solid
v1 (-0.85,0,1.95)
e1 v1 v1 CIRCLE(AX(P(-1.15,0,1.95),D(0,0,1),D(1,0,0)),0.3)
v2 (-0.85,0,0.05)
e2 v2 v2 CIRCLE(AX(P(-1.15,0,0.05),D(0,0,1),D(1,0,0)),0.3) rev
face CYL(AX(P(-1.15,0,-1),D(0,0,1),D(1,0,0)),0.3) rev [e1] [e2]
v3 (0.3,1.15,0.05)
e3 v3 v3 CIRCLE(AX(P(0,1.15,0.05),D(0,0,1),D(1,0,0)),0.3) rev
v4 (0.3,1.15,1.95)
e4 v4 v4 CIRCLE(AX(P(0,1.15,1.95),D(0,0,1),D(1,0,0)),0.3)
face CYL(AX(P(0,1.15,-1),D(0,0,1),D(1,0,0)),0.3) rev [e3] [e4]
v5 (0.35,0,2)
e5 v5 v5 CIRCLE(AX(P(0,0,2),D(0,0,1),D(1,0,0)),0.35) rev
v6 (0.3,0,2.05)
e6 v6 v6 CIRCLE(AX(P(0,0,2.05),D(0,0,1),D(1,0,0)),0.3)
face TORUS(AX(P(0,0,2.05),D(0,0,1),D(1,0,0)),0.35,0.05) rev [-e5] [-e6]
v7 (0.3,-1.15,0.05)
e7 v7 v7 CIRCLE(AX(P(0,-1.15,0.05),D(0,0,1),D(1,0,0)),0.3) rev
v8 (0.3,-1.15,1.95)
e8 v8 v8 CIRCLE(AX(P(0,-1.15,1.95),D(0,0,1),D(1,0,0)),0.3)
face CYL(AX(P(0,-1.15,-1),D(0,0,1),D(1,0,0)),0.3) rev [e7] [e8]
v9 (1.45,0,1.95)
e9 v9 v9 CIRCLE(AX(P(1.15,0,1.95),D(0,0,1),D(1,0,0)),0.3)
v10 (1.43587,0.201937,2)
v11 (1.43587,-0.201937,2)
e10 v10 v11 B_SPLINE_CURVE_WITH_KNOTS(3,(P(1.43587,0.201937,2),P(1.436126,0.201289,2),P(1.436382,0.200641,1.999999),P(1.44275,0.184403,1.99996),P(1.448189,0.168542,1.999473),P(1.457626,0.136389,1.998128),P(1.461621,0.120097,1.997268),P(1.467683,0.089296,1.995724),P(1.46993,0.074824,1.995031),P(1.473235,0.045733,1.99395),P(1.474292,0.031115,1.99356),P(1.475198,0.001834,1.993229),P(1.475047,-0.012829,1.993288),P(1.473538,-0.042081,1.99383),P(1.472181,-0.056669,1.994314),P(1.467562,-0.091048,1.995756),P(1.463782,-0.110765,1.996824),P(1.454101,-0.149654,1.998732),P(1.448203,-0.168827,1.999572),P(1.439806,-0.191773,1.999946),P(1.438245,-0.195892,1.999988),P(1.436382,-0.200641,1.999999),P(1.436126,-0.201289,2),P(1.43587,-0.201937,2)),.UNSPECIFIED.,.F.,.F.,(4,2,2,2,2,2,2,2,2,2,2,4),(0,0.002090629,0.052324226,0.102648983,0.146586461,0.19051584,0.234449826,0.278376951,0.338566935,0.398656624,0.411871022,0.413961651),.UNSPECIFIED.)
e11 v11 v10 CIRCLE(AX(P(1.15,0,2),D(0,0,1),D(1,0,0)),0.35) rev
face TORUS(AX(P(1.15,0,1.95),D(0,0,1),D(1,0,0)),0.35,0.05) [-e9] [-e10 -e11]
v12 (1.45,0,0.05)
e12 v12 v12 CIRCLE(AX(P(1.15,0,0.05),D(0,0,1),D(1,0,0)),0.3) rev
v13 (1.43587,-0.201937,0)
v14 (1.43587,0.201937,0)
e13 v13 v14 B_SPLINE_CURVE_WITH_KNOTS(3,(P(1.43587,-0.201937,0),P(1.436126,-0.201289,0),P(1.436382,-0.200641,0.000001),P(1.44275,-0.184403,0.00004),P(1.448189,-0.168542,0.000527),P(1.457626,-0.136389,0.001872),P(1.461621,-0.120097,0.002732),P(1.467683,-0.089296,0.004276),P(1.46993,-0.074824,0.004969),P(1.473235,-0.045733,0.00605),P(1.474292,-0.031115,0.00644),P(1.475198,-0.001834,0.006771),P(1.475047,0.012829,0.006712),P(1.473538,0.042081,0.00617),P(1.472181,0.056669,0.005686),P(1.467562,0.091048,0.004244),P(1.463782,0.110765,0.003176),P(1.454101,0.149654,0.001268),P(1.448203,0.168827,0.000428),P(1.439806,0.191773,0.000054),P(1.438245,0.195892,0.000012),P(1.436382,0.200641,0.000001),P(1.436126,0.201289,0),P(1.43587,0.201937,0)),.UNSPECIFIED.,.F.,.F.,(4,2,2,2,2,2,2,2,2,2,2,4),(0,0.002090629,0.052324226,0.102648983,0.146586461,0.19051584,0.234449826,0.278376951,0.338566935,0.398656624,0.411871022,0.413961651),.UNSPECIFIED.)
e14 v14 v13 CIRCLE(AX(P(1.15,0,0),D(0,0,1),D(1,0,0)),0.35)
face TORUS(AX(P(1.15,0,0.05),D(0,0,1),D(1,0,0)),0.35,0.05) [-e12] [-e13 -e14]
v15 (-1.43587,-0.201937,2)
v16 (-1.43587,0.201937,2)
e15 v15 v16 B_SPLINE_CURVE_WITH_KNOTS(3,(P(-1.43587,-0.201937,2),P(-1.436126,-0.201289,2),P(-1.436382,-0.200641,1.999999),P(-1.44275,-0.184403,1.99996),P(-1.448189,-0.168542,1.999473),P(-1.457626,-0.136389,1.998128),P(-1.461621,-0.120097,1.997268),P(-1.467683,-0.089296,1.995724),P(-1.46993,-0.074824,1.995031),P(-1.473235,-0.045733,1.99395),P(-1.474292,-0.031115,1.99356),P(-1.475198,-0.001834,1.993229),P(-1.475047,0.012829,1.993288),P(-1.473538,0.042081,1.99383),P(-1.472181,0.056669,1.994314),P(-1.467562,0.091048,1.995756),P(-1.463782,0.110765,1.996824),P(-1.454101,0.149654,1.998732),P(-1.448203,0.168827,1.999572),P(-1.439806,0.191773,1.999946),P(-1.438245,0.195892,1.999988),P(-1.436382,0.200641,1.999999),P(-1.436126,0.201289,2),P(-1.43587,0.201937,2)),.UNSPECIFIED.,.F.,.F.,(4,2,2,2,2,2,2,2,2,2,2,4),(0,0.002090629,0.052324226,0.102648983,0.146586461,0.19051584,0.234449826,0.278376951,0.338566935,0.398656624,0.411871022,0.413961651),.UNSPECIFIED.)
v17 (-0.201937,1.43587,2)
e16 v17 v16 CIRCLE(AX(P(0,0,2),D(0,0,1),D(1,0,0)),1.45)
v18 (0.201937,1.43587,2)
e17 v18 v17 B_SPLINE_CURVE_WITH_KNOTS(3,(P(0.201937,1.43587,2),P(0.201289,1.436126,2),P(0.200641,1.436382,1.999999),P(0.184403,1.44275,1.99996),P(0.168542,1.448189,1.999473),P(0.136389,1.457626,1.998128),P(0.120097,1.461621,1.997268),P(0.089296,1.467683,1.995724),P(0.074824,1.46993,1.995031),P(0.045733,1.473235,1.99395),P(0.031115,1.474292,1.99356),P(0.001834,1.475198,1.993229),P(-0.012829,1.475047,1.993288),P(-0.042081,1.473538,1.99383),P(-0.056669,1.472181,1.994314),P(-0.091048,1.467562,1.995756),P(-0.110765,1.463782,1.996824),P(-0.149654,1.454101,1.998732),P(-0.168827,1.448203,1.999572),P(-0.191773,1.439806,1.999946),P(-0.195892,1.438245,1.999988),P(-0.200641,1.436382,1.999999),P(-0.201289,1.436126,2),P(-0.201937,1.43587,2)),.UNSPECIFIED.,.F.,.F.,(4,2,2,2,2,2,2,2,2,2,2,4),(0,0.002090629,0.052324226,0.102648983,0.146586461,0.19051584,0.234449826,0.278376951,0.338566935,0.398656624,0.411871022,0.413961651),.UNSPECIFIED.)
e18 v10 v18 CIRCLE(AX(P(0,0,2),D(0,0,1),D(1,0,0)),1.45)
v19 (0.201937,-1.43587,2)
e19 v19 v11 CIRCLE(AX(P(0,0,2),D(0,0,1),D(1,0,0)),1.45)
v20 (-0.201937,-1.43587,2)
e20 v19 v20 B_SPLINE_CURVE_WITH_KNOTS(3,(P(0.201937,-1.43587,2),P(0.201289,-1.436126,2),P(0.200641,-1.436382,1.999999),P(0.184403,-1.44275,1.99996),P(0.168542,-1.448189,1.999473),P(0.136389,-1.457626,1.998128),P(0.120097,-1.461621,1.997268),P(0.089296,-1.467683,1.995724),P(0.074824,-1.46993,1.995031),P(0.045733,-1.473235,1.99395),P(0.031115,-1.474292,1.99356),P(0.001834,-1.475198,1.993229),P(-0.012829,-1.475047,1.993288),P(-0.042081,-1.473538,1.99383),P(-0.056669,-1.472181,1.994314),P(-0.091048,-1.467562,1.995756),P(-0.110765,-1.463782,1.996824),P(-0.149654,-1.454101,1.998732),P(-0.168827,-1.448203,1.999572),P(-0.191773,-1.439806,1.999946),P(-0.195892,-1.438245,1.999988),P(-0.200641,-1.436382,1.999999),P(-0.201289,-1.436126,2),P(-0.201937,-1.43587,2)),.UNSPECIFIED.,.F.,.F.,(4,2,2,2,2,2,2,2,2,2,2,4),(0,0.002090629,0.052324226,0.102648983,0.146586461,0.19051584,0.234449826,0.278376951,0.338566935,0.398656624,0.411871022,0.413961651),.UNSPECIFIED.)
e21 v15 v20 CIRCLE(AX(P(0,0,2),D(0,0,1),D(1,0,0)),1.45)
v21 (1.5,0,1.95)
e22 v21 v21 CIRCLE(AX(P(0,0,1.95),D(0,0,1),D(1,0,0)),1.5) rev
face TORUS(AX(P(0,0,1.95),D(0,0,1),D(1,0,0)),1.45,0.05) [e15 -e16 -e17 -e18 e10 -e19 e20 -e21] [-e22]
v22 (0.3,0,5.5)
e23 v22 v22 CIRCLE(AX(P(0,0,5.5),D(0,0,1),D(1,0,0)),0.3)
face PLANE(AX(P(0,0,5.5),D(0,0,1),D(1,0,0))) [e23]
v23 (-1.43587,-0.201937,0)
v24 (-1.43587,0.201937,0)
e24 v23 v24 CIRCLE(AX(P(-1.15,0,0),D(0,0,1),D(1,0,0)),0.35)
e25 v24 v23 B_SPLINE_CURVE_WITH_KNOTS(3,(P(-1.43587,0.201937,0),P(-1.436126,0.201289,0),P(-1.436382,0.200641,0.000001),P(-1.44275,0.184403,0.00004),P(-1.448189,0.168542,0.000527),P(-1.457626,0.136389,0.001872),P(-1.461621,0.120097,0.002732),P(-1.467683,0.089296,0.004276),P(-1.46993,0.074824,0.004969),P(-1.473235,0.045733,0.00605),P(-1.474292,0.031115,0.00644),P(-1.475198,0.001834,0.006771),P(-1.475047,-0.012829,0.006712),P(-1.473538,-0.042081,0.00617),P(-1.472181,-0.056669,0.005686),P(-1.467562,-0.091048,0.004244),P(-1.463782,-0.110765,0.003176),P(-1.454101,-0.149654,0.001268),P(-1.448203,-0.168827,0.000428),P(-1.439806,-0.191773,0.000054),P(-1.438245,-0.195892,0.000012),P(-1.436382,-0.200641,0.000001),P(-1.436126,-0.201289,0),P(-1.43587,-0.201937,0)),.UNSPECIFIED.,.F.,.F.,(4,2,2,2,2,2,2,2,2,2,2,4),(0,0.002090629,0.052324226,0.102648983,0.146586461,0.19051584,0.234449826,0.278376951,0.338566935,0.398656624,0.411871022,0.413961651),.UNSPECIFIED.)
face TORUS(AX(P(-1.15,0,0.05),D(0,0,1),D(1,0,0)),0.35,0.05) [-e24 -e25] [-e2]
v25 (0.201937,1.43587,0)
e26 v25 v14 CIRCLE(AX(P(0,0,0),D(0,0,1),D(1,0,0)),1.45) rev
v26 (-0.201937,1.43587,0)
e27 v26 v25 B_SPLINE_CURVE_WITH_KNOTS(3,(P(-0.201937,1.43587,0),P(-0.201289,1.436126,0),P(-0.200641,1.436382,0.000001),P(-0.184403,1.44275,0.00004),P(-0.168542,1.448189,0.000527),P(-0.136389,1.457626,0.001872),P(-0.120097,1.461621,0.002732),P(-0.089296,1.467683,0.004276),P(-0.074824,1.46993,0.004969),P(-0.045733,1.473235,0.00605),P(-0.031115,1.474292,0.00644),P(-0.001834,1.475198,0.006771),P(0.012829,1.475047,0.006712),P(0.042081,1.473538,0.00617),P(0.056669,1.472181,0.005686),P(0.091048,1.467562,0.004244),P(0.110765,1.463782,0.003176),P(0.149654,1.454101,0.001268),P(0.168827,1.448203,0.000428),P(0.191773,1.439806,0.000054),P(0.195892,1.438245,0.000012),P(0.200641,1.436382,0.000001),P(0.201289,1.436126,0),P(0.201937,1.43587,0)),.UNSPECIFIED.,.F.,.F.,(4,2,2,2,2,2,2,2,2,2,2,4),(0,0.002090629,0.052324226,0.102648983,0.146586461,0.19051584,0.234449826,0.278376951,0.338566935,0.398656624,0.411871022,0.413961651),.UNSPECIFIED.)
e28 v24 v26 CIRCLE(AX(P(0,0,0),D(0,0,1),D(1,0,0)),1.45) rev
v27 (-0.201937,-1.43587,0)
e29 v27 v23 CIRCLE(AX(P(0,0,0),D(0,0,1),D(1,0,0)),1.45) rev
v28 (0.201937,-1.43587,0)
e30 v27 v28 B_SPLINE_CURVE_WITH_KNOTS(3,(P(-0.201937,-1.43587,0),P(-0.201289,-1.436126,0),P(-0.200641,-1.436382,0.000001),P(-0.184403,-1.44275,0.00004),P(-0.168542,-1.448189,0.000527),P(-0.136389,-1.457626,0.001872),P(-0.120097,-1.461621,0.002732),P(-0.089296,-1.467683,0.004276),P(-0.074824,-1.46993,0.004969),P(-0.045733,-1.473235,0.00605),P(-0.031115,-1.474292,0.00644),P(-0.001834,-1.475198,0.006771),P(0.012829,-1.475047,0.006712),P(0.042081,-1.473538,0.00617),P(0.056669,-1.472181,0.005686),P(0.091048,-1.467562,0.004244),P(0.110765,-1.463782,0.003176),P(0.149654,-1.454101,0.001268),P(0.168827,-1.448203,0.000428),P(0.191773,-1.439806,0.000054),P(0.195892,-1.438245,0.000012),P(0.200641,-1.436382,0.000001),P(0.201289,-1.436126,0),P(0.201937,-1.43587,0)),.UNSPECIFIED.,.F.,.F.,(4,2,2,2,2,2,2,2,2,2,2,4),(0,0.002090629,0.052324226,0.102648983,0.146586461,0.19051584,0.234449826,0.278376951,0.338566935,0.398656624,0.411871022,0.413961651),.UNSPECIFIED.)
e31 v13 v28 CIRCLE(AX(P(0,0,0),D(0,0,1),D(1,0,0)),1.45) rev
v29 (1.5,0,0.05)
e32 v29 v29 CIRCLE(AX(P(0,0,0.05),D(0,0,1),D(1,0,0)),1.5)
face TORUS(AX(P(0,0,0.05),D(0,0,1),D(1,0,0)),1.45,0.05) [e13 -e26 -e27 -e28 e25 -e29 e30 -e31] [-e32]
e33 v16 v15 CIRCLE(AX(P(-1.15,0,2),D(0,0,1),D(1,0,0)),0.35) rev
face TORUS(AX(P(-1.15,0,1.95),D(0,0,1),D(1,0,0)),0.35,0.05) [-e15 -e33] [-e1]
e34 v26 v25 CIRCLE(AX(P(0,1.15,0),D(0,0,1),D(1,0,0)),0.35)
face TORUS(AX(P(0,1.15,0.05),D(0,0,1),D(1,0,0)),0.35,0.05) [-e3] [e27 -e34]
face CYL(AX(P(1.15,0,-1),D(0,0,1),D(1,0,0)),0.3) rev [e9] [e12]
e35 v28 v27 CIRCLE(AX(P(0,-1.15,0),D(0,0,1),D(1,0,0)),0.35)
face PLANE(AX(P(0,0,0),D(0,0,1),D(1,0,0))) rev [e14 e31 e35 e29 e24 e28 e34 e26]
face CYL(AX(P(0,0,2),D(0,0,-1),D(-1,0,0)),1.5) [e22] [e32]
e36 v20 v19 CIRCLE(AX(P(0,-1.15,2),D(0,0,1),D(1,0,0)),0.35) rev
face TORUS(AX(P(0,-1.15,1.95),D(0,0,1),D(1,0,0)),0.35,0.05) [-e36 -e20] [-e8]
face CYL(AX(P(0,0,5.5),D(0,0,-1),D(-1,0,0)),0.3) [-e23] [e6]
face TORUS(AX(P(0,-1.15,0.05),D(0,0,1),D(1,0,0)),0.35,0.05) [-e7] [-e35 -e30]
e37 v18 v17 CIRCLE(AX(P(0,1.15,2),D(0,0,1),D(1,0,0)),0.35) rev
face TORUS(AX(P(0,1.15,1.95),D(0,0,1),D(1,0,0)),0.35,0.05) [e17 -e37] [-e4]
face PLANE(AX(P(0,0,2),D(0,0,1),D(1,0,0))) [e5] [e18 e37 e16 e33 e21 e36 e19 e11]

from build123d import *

# Parameters (mm, degrees)
SKETCH1_R                = 1.5
BOSS_EXTRUDE1_DEPTH      = 2
SKETCH3_R                = 0.3
CUT_EXTRUDE2_DEPTH       = 3
BOSS_EXTRUDE2_DEPTH      = 3.5
BOSS_EXTRUDE2_DEPTH_BACK = 2
SKETCH2_R                = 0.3
FILLET1_R                = 0.05


with BuildPart() as part:
    # Sketch1 → Boss-Extrude1 (new body)
    with BuildSketch(Plane.XY):
        Circle(SKETCH1_R)
    extrude(amount=BOSS_EXTRUDE1_DEPTH)

    # Sketch3 → Cut-Extrude2 (cut)
    with BuildSketch(Plane.XY.offset(2)):
        with Locations((0, 1.15)):
            Circle(SKETCH3_R)
        with Locations((1.15, 0)):
            Circle(SKETCH3_R)
        with Locations((0, -1.15)):
            Circle(SKETCH3_R)
        with Locations((-1.15, 0)):
            Circle(SKETCH3_R)
    extrude(amount=-CUT_EXTRUDE2_DEPTH, mode=Mode.SUBTRACT)

    # Sketch2 → Boss-Extrude2 (add, two sides: drawn at the far end of the back side and taken through both)
    with BuildSketch(Plane.XY.offset(2).offset(-BOSS_EXTRUDE2_DEPTH_BACK)):
        Circle(SKETCH2_R)
    extrude(amount=BOSS_EXTRUDE2_DEPTH + BOSS_EXTRUDE2_DEPTH_BACK)

    # Fillet1
    # the kernel refuses this fillet: 0.05 mm, written as the material it adds along each edge
    with BuildSketch(Plane(origin=(0, 0, 2), x_dir=(1, 0, 0), z_dir=(0, -1, 0))) as fillet1_piece_1:
        with BuildLine():
            CenterArc((0.3 + FILLET1_R, FILLET1_R), FILLET1_R, 180, 90)
            Line((0.3, FILLET1_R), (0.3, 0))
            Line((0.3, 0), (0.3 + FILLET1_R, 0))
        make_face()
    revolve(axis=Axis((0, 0, 2), (0, 0, 1)))
    # the kernel refuses this fillet: 0.05 mm, written as the material it takes off along each edge
    with BuildSketch(Plane(origin=(-1.15, 0, 0), x_dir=(1, 0, 0), z_dir=(0, -1, 0))) as fillet1_2_piece_1:
        with BuildLine():
            CenterArc((0.3 + FILLET1_R, FILLET1_R), FILLET1_R, 180, 90)
            Line((0.3, FILLET1_R), (0.3, 0))
            Line((0.3, 0), (0.3 + FILLET1_R, 0))
        make_face()
    revolve(axis=Axis((-1.15, 0, 0), (0, 0, 1)), mode=Mode.SUBTRACT)
    with BuildSketch(Plane(origin=(-1.15, 0, 2), x_dir=(1, 0, 0), z_dir=(0, -1, 0))) as fillet1_2_piece_2:
        with BuildLine():
            CenterArc((0.3 + FILLET1_R, -FILLET1_R), FILLET1_R, 90, 90)
            Line((0.3, -FILLET1_R), (0.3, 0))
            Line((0.3, 0), (0.3 + FILLET1_R, 0))
        make_face()
    revolve(axis=Axis((-1.15, 0, 2), (0, 0, 1)), mode=Mode.SUBTRACT)
    with BuildSketch(Plane(origin=(1.15, 0, 0), x_dir=(1, 0, 0), z_dir=(0, -1, 0))) as fillet1_2_piece_3:
        with BuildLine():
            CenterArc((0.3 + FILLET1_R, FILLET1_R), FILLET1_R, 180, 90)
            Line((0.3, FILLET1_R), (0.3, 0))
            Line((0.3, 0), (0.3 + FILLET1_R, 0))
        make_face()
    revolve(axis=Axis((1.15, 0, 0), (0, 0, 1)), mode=Mode.SUBTRACT)
    with BuildSketch(Plane(origin=(1.15, 0, 2), x_dir=(1, 0, 0), z_dir=(0, -1, 0))) as fillet1_2_piece_4:
        with BuildLine():
            CenterArc((0.3 + FILLET1_R, -FILLET1_R), FILLET1_R, 90, 90)
            Line((0.3, -FILLET1_R), (0.3, 0))
            Line((0.3, 0), (0.3 + FILLET1_R, 0))
        make_face()
    revolve(axis=Axis((1.15, 0, 2), (0, 0, 1)), mode=Mode.SUBTRACT)
    with BuildSketch(Plane(origin=(0, 0, 0), x_dir=(1, 0, 0), z_dir=(0, -1, 0))) as fillet1_2_piece_5:
        with BuildLine():
            CenterArc((1.5 - FILLET1_R, FILLET1_R), FILLET1_R, 270, 90)
            Line((1.5 - FILLET1_R, 0), (1.5, 0))
            Line((1.5, 0), (1.5, FILLET1_R))
        make_face()
    revolve(axis=Axis((0, 0, 0), (0, 0, 1)), mode=Mode.SUBTRACT)
    with BuildSketch(Plane(origin=(0, -1.15, 0), x_dir=(1, 0, 0), z_dir=(0, -1, 0))) as fillet1_2_piece_6:
        with BuildLine():
            CenterArc((0.3 + FILLET1_R, FILLET1_R), FILLET1_R, 180, 90)
            Line((0.3, FILLET1_R), (0.3, 0))
            Line((0.3, 0), (0.3 + FILLET1_R, 0))
        make_face()
    revolve(axis=Axis((0, -1.15, 0), (0, 0, 1)), mode=Mode.SUBTRACT)
    with BuildSketch(Plane(origin=(0, -1.15, 2), x_dir=(1, 0, 0), z_dir=(0, -1, 0))) as fillet1_2_piece_7:
        with BuildLine():
            CenterArc((0.3 + FILLET1_R, -FILLET1_R), FILLET1_R, 90, 90)
            Line((0.3, -FILLET1_R), (0.3, 0))
            Line((0.3, 0), (0.3 + FILLET1_R, 0))
        make_face()
    revolve(axis=Axis((0, -1.15, 2), (0, 0, 1)), mode=Mode.SUBTRACT)
    with BuildSketch(Plane(origin=(0, 0, 2), x_dir=(1, 0, 0), z_dir=(0, -1, 0))) as fillet1_2_piece_8:
        with BuildLine():
            CenterArc((1.5 - FILLET1_R, -FILLET1_R), FILLET1_R, 0, 90)
            Line((1.5 - FILLET1_R, 0), (1.5, 0))
            Line((1.5, 0), (1.5, -FILLET1_R))
        make_face()
    revolve(axis=Axis((0, 0, 2), (0, 0, 1)), mode=Mode.SUBTRACT)
    with BuildSketch(Plane(origin=(0, 1.15, 0), x_dir=(1, 0, 0), z_dir=(0, -1, 0))) as fillet1_2_piece_9:
        with BuildLine():
            CenterArc((0.3 + FILLET1_R, FILLET1_R), FILLET1_R, 180, 90)
            Line((0.3, FILLET1_R), (0.3, 0))
            Line((0.3, 0), (0.3 + FILLET1_R, 0))
        make_face()
    revolve(axis=Axis((0, 1.15, 0), (0, 0, 1)), mode=Mode.SUBTRACT)
    with BuildSketch(Plane(origin=(0, 1.15, 2), x_dir=(1, 0, 0), z_dir=(0, -1, 0))) as fillet1_2_piece_10:
        with BuildLine():
            CenterArc((0.3 + FILLET1_R, -FILLET1_R), FILLET1_R, 90, 90)
            Line((0.3, -FILLET1_R), (0.3, 0))
            Line((0.3, 0), (0.3 + FILLET1_R, 0))
        make_face()
    revolve(axis=Axis((0, 1.15, 2), (0, 0, 1)), mode=Mode.SUBTRACT)


solid = part.part
